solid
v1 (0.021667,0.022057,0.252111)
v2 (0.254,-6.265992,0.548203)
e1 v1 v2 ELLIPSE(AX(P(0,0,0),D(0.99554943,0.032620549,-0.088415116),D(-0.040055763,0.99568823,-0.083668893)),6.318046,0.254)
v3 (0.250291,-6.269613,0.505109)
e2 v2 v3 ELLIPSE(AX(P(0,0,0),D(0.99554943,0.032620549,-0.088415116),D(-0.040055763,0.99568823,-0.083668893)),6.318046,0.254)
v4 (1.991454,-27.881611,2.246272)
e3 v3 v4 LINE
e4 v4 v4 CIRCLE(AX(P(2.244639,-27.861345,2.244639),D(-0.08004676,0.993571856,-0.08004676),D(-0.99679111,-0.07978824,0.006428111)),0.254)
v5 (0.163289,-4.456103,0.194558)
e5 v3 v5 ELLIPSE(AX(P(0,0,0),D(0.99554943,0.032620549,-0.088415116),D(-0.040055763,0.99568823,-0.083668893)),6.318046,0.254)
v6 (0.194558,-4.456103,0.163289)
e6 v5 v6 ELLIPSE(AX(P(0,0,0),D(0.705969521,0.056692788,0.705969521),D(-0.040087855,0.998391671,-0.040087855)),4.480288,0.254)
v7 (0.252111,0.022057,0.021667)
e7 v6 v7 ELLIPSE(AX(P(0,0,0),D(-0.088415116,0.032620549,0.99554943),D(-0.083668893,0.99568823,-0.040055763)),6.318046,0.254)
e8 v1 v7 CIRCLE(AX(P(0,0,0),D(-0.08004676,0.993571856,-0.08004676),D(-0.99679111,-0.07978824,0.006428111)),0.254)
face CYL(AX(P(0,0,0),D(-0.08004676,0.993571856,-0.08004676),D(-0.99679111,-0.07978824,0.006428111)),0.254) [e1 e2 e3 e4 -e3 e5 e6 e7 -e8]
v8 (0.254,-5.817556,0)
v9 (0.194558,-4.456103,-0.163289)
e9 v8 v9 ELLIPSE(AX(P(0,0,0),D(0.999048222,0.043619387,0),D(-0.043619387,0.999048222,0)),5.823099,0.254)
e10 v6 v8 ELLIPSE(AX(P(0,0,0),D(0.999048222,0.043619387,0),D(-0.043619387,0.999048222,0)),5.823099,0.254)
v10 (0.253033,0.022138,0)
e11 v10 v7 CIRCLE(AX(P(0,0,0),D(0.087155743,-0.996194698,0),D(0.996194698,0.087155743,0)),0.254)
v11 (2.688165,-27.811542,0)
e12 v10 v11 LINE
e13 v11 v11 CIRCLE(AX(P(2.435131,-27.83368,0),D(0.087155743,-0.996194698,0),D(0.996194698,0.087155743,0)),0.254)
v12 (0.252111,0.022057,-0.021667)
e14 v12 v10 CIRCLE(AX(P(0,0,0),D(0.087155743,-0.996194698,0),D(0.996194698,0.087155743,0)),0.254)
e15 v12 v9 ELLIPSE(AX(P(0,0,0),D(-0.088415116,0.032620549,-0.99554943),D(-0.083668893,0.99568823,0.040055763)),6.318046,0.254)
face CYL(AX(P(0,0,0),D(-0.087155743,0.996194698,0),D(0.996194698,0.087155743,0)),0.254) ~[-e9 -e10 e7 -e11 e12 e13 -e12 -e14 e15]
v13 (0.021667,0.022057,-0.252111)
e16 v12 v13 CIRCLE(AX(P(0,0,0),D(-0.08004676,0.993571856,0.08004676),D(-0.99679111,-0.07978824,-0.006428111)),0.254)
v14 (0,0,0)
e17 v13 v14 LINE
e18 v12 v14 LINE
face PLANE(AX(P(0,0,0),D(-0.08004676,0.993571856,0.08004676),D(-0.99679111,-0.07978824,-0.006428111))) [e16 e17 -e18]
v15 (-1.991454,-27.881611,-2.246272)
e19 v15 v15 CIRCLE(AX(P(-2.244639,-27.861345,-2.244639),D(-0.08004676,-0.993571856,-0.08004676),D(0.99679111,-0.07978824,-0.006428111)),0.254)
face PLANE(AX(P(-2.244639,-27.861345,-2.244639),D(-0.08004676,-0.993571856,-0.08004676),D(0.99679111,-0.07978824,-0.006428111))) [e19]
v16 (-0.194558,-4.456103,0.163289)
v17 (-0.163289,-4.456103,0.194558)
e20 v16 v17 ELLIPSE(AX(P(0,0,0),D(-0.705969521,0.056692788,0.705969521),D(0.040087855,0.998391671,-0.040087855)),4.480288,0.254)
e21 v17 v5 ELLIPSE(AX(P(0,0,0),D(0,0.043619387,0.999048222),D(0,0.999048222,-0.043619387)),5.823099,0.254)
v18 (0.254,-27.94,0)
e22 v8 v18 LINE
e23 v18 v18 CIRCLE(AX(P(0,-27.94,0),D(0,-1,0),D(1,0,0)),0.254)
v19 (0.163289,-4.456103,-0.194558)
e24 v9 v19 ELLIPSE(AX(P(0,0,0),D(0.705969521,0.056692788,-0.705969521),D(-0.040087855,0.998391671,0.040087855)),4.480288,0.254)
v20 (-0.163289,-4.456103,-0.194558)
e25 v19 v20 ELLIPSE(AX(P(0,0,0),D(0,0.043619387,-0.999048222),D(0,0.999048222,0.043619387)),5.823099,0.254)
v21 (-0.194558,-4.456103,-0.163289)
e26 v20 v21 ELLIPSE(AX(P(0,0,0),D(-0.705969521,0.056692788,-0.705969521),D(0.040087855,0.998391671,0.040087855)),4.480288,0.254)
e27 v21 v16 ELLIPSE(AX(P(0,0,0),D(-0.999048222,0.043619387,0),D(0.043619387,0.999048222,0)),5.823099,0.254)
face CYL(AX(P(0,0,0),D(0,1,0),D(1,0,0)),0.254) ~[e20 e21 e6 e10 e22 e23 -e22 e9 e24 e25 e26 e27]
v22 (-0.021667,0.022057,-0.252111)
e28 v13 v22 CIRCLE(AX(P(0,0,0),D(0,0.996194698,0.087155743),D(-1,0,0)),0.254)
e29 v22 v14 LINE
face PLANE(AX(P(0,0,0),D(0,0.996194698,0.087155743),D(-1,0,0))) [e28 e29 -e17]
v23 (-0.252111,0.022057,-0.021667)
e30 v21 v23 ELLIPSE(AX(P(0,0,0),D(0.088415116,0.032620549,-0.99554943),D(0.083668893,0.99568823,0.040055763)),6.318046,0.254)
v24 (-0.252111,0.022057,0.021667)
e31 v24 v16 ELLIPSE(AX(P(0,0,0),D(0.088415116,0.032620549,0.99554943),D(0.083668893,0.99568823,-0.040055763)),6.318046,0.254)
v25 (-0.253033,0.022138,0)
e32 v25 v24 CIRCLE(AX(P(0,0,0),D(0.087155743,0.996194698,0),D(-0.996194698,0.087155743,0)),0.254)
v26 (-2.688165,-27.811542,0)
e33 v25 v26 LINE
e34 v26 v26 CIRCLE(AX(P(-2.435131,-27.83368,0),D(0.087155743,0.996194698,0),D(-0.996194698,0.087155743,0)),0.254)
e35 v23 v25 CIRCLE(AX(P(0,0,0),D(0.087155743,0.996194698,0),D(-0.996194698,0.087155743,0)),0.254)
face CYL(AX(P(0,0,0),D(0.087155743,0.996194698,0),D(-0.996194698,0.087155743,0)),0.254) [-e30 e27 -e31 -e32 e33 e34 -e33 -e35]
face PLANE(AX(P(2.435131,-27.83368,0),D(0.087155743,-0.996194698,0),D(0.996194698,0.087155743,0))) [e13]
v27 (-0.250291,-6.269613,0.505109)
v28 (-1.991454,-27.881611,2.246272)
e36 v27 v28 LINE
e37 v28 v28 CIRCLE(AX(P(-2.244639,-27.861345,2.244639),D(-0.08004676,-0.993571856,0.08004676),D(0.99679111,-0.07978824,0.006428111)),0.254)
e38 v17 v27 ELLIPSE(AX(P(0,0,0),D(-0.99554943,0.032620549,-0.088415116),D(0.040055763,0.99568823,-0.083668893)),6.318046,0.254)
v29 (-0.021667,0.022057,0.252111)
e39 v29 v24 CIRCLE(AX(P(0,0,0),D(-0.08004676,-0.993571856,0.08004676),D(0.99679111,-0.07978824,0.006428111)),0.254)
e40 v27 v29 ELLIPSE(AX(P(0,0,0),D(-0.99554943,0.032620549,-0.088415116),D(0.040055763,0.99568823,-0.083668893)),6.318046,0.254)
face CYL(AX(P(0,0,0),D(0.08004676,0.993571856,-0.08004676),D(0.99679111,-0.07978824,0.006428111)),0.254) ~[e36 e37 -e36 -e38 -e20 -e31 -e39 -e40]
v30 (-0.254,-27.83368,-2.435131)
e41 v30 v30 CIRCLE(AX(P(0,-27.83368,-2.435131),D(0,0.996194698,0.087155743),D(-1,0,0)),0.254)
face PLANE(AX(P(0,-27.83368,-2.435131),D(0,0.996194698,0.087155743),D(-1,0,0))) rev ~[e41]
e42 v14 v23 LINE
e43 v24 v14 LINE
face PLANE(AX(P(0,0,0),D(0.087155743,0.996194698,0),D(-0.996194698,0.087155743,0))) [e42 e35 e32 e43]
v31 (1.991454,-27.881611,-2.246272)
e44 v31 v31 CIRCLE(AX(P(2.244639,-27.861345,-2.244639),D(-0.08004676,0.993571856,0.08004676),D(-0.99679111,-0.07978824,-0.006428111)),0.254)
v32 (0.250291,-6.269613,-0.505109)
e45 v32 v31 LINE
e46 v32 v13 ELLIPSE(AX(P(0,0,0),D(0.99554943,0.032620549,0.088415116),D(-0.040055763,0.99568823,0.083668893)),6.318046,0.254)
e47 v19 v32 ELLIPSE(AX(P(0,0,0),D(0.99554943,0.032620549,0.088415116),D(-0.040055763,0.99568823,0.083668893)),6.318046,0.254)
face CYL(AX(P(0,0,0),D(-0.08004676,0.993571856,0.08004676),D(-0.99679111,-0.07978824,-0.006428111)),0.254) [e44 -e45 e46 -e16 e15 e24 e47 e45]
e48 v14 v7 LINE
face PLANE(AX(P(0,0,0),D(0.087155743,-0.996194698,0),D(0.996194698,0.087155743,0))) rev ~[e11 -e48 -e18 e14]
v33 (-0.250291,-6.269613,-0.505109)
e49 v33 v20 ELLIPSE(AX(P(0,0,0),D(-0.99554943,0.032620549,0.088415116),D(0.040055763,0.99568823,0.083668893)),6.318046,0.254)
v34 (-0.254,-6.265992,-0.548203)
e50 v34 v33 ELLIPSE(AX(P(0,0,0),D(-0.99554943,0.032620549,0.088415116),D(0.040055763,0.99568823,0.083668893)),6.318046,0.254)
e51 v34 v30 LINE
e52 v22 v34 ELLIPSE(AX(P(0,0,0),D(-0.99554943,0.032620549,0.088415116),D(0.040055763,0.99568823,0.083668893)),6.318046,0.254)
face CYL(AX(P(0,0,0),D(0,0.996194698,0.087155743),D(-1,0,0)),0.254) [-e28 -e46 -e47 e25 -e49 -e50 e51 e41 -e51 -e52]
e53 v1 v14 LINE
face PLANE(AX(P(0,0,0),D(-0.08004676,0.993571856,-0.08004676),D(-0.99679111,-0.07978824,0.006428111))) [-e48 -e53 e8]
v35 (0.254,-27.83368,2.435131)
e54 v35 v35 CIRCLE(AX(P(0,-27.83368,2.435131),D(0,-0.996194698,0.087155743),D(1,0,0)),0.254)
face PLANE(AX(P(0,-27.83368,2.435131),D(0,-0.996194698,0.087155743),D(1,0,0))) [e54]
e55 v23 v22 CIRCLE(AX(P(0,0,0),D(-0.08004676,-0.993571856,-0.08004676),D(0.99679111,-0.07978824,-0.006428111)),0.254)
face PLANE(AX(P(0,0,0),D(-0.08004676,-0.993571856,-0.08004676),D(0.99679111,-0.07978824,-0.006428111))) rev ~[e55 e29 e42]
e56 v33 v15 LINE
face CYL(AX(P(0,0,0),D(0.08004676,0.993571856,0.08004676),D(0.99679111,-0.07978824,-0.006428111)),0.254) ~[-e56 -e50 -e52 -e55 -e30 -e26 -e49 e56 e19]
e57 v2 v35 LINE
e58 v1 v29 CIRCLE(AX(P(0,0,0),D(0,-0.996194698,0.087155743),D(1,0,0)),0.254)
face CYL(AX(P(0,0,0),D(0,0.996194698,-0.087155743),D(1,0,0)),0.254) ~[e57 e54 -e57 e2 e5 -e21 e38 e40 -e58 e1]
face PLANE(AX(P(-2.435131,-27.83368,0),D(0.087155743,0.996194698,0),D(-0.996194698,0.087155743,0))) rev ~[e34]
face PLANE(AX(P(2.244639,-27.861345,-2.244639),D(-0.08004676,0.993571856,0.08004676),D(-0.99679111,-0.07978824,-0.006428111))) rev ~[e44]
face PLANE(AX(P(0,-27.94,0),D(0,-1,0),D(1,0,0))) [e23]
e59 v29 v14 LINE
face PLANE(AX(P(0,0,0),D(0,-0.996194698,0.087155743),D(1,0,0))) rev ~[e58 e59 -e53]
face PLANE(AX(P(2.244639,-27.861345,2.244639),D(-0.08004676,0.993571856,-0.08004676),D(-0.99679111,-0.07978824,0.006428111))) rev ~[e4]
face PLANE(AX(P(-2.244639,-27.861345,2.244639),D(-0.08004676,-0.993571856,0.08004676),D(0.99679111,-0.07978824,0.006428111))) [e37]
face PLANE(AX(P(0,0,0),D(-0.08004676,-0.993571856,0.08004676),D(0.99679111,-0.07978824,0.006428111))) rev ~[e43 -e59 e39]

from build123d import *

# Parameters (mm, degrees)
F0_R      = 0.254
F1_DEPTH  = 27.94
F4_R      = 0.254
F5_DEPTH  = 27.94
F7_R      = 0.254
F8_DEPTH  = 27.94
F11_R     = 0.254
F12_DEPTH = 27.94
F14_R     = 0.254
F15_DEPTH = 27.94
F18_R     = 0.254
F19_DEPTH = 28.0416
F21_R     = 0.254
F22_DEPTH = 28.0416
F24_R     = 0.254
F25_DEPTH = 28.0416
F27_R     = 0.254
F28_DEPTH = 28.0416


with BuildPart() as f1:
    # F0 (on Front) → F1 (new body)
    with BuildSketch(Plane.XZ):
        Circle(F0_R)
    extrude(amount=F1_DEPTH)

    # F4 (on line) → F5 (join)
    with BuildSketch(Plane(origin=(0, 0, 0), x_dir=(-0.9961946981, 0.0871557427, 0), z_dir=(0.0871557427, 0.9961946981, 0))):
        Circle(F4_R)
    extrude(amount=-F5_DEPTH)

    # F7 (on line) → F8 (join)
    with BuildSketch(Plane(origin=(0, 0, 0), x_dir=(0.9961946981, 0.0871557427, 0), z_dir=(0.0871557427, -0.9961946981, 0))):
        Circle(F7_R)
    extrude(amount=F8_DEPTH)

    # F11 (on line) → F12 (join)
    with BuildSketch(Plane(origin=(0, 0, 0), x_dir=(-1, 0, 0), z_dir=(0, 0.9961946981, 0.0871557427))):
        Circle(F11_R)
    extrude(amount=-F12_DEPTH)

    # F14 (on line) → F15 (join)
    with BuildSketch(Plane(origin=(0, 0, 0), x_dir=(1, 0, 0), z_dir=(0, -0.9961946981, 0.0871557427))):
        Circle(F14_R)
    extrude(amount=F15_DEPTH)

    # F18 (on line) → F19 (join)
    with BuildSketch(Plane(origin=(0, 0, 0), x_dir=(-0.9967911096, -0.0797882397, -0.0064281109), z_dir=(-0.0800467601, 0.9935718557, 0.0800467601))):
        Circle(F18_R)
    extrude(amount=-F19_DEPTH)

    # F21 (on line) → F22 (join)
    with BuildSketch(Plane(origin=(0, 0, 0), x_dir=(0.9967911096, -0.0797882397, 0.0064281109), z_dir=(-0.0800467601, -0.9935718557, 0.0800467601))):
        Circle(F21_R)
    extrude(amount=F22_DEPTH)

    # F24 (on line) → F25 (join)
    with BuildSketch(Plane(origin=(0, 0, 0), x_dir=(-0.9967911096, -0.0797882397, 0.0064281109), z_dir=(-0.0800467601, 0.9935718557, -0.0800467601))):
        Circle(F24_R)
    extrude(amount=-F25_DEPTH)

    # F27 (on line) → F28 (join)
    with BuildSketch(Plane(origin=(0, 0, 0), x_dir=(0.9967911096, -0.0797882397, -0.0064281109), z_dir=(-0.0800467601, -0.9935718557, -0.0800467601))):
        Circle(F27_R)
    extrude(amount=F28_DEPTH)


solid = f1.part
